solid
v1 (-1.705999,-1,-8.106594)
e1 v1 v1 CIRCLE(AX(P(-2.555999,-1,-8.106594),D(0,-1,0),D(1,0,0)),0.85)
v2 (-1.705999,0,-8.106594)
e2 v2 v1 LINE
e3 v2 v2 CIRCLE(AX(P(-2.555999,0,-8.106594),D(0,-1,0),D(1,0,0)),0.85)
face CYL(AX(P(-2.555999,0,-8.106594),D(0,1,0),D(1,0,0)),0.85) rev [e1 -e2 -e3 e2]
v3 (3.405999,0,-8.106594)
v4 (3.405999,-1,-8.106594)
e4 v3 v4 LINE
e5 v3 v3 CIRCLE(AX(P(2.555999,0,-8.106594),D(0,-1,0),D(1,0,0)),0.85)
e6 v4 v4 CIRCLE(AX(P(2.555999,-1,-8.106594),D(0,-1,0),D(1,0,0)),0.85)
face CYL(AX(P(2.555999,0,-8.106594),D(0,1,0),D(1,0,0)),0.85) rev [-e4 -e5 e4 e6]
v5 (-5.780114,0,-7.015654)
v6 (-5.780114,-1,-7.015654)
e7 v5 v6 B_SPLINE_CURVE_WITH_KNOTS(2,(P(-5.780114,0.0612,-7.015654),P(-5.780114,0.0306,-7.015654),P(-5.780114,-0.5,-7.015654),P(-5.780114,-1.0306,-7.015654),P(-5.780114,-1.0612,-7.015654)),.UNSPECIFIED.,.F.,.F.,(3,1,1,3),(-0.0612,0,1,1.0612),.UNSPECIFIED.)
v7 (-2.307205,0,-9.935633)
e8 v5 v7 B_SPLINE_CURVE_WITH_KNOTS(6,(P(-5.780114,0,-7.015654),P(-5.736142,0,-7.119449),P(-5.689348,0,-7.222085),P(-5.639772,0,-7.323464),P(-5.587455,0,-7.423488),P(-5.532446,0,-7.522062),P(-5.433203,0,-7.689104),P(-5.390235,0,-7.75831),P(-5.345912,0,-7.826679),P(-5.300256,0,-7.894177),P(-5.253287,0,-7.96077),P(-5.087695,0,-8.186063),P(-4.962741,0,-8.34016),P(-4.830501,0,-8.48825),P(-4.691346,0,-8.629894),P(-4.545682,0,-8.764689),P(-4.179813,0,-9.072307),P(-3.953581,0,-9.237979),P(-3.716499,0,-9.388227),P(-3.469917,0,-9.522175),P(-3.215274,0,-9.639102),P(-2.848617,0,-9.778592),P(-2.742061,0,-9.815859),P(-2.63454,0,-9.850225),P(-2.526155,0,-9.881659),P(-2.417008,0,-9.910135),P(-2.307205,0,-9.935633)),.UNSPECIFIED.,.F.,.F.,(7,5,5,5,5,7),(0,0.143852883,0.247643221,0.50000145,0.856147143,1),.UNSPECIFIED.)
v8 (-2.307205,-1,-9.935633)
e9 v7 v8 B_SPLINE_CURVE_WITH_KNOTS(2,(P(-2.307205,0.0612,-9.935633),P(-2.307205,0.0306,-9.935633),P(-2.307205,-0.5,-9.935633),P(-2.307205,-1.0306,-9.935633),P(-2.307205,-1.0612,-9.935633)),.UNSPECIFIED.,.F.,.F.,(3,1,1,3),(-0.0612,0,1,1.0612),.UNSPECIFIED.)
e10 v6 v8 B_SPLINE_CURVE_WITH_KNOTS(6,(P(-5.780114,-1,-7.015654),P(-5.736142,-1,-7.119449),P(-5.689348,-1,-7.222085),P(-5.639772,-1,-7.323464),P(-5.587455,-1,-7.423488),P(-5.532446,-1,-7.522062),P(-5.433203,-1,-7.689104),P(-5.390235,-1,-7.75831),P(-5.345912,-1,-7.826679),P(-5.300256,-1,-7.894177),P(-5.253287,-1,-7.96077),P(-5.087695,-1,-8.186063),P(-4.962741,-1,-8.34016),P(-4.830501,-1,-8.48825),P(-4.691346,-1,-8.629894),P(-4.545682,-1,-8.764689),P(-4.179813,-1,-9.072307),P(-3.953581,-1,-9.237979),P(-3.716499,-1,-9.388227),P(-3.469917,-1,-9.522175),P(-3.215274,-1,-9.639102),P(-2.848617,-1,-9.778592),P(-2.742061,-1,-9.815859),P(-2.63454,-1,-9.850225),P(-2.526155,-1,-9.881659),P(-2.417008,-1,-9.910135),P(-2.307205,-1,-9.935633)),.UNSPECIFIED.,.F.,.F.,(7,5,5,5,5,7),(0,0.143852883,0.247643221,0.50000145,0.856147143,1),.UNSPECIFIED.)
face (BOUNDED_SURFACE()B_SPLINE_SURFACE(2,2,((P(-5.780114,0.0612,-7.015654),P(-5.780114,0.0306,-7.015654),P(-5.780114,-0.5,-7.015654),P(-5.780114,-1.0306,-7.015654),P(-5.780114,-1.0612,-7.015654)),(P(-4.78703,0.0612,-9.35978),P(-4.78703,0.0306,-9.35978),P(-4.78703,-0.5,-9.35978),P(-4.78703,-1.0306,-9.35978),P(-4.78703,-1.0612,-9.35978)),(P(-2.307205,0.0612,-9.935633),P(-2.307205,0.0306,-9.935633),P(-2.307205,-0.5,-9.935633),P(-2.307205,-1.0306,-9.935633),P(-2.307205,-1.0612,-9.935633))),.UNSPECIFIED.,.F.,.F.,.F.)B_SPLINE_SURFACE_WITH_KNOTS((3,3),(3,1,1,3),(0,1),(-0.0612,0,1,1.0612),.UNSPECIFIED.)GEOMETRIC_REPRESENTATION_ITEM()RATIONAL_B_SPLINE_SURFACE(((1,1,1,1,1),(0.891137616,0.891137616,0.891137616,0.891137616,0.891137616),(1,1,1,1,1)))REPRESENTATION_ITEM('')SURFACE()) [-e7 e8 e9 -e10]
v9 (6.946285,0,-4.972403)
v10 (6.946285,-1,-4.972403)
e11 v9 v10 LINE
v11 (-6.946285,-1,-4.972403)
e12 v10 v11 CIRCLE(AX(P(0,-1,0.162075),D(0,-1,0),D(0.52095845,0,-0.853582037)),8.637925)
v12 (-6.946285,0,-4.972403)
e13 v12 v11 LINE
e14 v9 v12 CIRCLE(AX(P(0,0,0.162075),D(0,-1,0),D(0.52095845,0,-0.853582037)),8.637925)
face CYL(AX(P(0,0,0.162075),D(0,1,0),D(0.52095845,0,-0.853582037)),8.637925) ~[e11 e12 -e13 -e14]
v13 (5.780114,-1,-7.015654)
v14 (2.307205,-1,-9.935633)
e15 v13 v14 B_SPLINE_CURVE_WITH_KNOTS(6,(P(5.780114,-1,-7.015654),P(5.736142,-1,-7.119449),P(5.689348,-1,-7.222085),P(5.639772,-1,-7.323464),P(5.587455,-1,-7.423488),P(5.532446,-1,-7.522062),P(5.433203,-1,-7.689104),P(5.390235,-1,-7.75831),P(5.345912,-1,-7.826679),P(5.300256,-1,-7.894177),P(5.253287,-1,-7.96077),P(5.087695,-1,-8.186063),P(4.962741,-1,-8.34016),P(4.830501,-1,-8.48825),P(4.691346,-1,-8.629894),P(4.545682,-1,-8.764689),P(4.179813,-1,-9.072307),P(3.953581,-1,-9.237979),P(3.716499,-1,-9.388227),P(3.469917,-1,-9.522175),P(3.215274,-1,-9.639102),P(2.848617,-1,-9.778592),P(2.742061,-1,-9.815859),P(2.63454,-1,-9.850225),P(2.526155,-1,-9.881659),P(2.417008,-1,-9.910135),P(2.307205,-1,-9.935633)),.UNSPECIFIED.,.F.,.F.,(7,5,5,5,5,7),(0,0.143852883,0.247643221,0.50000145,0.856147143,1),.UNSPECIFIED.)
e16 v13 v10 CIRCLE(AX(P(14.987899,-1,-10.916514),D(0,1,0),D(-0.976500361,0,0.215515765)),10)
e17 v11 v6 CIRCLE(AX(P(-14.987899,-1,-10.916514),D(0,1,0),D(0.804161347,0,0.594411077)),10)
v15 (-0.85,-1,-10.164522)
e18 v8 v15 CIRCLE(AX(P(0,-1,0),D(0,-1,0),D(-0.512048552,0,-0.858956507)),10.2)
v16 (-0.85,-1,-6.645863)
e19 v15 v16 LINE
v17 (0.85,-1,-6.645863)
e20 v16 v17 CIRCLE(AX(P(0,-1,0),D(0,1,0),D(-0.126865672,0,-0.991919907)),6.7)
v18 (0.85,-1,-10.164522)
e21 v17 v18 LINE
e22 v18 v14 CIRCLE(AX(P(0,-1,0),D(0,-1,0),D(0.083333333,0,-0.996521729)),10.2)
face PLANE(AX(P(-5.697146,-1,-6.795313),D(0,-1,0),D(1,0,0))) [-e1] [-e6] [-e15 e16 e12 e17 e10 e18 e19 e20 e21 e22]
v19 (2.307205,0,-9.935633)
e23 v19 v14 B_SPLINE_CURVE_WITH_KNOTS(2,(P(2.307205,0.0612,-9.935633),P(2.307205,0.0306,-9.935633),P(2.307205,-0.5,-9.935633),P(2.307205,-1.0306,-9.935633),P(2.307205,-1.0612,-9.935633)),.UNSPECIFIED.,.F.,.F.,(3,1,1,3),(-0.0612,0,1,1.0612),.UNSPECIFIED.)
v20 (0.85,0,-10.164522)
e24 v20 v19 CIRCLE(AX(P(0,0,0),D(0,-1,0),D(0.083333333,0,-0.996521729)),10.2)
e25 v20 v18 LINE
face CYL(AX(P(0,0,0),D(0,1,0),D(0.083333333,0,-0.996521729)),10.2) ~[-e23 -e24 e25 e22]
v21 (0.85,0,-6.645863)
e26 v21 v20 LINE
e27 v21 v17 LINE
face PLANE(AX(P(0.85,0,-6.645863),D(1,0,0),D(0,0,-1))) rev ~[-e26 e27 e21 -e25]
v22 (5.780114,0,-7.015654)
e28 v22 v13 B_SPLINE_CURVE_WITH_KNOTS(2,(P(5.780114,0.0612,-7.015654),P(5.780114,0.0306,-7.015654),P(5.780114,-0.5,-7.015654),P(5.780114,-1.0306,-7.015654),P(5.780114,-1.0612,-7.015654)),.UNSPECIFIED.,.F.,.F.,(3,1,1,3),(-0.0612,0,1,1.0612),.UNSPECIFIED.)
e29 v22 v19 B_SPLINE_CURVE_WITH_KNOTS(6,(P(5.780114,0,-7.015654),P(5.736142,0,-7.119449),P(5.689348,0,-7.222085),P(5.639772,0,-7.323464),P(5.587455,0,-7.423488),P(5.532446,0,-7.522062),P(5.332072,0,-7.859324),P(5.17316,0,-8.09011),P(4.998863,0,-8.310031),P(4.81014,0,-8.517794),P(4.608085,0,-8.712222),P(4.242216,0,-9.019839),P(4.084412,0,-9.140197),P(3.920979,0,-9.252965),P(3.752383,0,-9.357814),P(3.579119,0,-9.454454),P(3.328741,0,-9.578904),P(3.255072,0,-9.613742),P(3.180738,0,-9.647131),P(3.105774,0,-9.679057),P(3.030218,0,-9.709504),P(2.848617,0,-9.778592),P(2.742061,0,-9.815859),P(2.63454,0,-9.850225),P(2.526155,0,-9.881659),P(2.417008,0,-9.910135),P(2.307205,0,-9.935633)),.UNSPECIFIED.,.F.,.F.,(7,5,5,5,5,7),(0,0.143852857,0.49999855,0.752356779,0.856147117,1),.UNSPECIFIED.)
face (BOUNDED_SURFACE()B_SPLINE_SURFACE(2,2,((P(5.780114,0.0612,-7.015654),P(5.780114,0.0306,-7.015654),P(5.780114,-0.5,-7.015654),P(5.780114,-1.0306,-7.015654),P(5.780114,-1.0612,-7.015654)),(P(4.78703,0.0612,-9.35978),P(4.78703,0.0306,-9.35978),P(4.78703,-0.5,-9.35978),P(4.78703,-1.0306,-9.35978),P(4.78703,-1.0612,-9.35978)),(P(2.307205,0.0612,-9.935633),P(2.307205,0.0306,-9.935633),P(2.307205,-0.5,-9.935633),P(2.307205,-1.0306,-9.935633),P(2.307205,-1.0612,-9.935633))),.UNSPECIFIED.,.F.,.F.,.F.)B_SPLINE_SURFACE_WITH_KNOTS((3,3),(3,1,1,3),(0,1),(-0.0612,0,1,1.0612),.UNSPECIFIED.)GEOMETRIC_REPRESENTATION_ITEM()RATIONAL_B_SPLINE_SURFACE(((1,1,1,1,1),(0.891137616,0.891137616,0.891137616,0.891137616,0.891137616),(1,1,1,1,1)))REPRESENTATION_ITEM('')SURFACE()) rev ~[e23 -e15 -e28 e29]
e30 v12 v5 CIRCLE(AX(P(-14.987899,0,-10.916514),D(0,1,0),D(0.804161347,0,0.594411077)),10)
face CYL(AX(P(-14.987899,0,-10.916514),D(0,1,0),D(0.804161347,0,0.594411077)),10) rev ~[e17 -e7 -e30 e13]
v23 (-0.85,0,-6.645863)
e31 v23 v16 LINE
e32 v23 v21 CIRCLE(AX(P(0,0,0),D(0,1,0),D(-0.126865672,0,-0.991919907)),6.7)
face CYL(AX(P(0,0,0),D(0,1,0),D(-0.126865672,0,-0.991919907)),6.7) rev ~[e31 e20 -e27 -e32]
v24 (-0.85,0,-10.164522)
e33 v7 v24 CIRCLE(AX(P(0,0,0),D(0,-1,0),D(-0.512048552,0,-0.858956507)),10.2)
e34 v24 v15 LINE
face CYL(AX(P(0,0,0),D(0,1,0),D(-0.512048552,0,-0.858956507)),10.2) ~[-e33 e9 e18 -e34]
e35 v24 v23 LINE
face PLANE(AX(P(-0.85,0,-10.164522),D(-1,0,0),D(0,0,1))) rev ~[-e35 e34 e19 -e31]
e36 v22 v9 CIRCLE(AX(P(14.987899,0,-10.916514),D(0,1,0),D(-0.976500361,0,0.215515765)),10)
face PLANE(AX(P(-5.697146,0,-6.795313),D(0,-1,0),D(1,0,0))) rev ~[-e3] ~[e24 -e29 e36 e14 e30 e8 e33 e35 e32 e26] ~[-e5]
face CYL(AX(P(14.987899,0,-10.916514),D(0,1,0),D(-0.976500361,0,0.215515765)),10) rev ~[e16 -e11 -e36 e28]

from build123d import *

# Parameters (mm, degrees)
F0_R        = 0.85
F1_DEPTH    = 1
F2_T1_DEPTH = 1
F3_R        = 5


# Not quite as in the source:
# - a fillet or chamfer that OpenCascade refuses, or shapes differently, is made with other operations: its cross-section is extruded or revolved along the edge and cut away or added


with BuildPart() as f1:
    # F0 (on Front) → F1 (new body)
    with BuildSketch(Plane.XZ):
        with BuildLine():
            ThreePointArc((-0.85, -6.6458633751), (0, 6.7), (0.85, -6.6458633751))
            Line((0.85, -6.6458633751), (0.85, -10.1645216316))
            ThreePointArc((0.85, -10.1645216316), (3.1164454592, -9.7122483339), (5.2228952278, -8.7613563698))
            Line((5.2228952278, -8.7613563698), (4.5, -7.2111025509))
            ThreePointArc((4.5, -7.2111025509), (0, 8.8), (-4.5, -7.2111025509))
            Line((-4.5, -7.2111025509), (-5.2228952278, -8.7613563698))
            ThreePointArc((-5.2228952278, -8.7613563698), (-3.1164454592, -9.7122483339), (-0.85, -10.1645216316))
            Line((-0.85, -10.1645216316), (-0.85, -6.6458633751))
        make_face()
        with Locations((-2.5559992958, -8.1065940814)):
            Circle(F0_R, mode=Mode.SUBTRACT)
        with Locations((2.5559992958, -8.1065940814)):
            Circle(F0_R, mode=Mode.SUBTRACT)
    extrude(amount=F1_DEPTH)

    # F2: fillet of radius 10 on 2 edges, made by hand

    # F2_s2 → F2_t1 (join)
    with BuildSketch(Plane.XZ):
        with BuildLine():
            ThreePointArc((-6.9462853719, -4.9724032485), (-5.8852649135, -6.7762174559), (-5.2228952278, -8.7613563698))
            Line((-5.2228952278, -8.7613563698), (-4.5, -7.2111025509))
            ThreePointArc((-4.5, -7.2111025509), (-5.8315783323, -6.210243371), (-6.9462853719, -4.9724032485))
        make_face()
        with BuildLine():
            ThreePointArc((5.2228952278, -8.7613563698), (5.8852649135, -6.7762174559), (6.9462853719, -4.9724032485))
            ThreePointArc((6.9462853719, -4.9724032485), (5.8315783323, -6.210243371), (4.5, -7.2111025509))
            Line((4.5, -7.2111025509), (5.2228952278, -8.7613563698))
        make_face()
    extrude(amount=F2_T1_DEPTH)

    # F3
    f3_edges = [f1.edges().sort_by_distance(p)[0] for p in [
        (-5.222895, -0.5, -8.761356),
        (5.222895, -0.5, -8.761356),
    ]]
    fillet(f3_edges, radius=F3_R)


solid = f1.part
